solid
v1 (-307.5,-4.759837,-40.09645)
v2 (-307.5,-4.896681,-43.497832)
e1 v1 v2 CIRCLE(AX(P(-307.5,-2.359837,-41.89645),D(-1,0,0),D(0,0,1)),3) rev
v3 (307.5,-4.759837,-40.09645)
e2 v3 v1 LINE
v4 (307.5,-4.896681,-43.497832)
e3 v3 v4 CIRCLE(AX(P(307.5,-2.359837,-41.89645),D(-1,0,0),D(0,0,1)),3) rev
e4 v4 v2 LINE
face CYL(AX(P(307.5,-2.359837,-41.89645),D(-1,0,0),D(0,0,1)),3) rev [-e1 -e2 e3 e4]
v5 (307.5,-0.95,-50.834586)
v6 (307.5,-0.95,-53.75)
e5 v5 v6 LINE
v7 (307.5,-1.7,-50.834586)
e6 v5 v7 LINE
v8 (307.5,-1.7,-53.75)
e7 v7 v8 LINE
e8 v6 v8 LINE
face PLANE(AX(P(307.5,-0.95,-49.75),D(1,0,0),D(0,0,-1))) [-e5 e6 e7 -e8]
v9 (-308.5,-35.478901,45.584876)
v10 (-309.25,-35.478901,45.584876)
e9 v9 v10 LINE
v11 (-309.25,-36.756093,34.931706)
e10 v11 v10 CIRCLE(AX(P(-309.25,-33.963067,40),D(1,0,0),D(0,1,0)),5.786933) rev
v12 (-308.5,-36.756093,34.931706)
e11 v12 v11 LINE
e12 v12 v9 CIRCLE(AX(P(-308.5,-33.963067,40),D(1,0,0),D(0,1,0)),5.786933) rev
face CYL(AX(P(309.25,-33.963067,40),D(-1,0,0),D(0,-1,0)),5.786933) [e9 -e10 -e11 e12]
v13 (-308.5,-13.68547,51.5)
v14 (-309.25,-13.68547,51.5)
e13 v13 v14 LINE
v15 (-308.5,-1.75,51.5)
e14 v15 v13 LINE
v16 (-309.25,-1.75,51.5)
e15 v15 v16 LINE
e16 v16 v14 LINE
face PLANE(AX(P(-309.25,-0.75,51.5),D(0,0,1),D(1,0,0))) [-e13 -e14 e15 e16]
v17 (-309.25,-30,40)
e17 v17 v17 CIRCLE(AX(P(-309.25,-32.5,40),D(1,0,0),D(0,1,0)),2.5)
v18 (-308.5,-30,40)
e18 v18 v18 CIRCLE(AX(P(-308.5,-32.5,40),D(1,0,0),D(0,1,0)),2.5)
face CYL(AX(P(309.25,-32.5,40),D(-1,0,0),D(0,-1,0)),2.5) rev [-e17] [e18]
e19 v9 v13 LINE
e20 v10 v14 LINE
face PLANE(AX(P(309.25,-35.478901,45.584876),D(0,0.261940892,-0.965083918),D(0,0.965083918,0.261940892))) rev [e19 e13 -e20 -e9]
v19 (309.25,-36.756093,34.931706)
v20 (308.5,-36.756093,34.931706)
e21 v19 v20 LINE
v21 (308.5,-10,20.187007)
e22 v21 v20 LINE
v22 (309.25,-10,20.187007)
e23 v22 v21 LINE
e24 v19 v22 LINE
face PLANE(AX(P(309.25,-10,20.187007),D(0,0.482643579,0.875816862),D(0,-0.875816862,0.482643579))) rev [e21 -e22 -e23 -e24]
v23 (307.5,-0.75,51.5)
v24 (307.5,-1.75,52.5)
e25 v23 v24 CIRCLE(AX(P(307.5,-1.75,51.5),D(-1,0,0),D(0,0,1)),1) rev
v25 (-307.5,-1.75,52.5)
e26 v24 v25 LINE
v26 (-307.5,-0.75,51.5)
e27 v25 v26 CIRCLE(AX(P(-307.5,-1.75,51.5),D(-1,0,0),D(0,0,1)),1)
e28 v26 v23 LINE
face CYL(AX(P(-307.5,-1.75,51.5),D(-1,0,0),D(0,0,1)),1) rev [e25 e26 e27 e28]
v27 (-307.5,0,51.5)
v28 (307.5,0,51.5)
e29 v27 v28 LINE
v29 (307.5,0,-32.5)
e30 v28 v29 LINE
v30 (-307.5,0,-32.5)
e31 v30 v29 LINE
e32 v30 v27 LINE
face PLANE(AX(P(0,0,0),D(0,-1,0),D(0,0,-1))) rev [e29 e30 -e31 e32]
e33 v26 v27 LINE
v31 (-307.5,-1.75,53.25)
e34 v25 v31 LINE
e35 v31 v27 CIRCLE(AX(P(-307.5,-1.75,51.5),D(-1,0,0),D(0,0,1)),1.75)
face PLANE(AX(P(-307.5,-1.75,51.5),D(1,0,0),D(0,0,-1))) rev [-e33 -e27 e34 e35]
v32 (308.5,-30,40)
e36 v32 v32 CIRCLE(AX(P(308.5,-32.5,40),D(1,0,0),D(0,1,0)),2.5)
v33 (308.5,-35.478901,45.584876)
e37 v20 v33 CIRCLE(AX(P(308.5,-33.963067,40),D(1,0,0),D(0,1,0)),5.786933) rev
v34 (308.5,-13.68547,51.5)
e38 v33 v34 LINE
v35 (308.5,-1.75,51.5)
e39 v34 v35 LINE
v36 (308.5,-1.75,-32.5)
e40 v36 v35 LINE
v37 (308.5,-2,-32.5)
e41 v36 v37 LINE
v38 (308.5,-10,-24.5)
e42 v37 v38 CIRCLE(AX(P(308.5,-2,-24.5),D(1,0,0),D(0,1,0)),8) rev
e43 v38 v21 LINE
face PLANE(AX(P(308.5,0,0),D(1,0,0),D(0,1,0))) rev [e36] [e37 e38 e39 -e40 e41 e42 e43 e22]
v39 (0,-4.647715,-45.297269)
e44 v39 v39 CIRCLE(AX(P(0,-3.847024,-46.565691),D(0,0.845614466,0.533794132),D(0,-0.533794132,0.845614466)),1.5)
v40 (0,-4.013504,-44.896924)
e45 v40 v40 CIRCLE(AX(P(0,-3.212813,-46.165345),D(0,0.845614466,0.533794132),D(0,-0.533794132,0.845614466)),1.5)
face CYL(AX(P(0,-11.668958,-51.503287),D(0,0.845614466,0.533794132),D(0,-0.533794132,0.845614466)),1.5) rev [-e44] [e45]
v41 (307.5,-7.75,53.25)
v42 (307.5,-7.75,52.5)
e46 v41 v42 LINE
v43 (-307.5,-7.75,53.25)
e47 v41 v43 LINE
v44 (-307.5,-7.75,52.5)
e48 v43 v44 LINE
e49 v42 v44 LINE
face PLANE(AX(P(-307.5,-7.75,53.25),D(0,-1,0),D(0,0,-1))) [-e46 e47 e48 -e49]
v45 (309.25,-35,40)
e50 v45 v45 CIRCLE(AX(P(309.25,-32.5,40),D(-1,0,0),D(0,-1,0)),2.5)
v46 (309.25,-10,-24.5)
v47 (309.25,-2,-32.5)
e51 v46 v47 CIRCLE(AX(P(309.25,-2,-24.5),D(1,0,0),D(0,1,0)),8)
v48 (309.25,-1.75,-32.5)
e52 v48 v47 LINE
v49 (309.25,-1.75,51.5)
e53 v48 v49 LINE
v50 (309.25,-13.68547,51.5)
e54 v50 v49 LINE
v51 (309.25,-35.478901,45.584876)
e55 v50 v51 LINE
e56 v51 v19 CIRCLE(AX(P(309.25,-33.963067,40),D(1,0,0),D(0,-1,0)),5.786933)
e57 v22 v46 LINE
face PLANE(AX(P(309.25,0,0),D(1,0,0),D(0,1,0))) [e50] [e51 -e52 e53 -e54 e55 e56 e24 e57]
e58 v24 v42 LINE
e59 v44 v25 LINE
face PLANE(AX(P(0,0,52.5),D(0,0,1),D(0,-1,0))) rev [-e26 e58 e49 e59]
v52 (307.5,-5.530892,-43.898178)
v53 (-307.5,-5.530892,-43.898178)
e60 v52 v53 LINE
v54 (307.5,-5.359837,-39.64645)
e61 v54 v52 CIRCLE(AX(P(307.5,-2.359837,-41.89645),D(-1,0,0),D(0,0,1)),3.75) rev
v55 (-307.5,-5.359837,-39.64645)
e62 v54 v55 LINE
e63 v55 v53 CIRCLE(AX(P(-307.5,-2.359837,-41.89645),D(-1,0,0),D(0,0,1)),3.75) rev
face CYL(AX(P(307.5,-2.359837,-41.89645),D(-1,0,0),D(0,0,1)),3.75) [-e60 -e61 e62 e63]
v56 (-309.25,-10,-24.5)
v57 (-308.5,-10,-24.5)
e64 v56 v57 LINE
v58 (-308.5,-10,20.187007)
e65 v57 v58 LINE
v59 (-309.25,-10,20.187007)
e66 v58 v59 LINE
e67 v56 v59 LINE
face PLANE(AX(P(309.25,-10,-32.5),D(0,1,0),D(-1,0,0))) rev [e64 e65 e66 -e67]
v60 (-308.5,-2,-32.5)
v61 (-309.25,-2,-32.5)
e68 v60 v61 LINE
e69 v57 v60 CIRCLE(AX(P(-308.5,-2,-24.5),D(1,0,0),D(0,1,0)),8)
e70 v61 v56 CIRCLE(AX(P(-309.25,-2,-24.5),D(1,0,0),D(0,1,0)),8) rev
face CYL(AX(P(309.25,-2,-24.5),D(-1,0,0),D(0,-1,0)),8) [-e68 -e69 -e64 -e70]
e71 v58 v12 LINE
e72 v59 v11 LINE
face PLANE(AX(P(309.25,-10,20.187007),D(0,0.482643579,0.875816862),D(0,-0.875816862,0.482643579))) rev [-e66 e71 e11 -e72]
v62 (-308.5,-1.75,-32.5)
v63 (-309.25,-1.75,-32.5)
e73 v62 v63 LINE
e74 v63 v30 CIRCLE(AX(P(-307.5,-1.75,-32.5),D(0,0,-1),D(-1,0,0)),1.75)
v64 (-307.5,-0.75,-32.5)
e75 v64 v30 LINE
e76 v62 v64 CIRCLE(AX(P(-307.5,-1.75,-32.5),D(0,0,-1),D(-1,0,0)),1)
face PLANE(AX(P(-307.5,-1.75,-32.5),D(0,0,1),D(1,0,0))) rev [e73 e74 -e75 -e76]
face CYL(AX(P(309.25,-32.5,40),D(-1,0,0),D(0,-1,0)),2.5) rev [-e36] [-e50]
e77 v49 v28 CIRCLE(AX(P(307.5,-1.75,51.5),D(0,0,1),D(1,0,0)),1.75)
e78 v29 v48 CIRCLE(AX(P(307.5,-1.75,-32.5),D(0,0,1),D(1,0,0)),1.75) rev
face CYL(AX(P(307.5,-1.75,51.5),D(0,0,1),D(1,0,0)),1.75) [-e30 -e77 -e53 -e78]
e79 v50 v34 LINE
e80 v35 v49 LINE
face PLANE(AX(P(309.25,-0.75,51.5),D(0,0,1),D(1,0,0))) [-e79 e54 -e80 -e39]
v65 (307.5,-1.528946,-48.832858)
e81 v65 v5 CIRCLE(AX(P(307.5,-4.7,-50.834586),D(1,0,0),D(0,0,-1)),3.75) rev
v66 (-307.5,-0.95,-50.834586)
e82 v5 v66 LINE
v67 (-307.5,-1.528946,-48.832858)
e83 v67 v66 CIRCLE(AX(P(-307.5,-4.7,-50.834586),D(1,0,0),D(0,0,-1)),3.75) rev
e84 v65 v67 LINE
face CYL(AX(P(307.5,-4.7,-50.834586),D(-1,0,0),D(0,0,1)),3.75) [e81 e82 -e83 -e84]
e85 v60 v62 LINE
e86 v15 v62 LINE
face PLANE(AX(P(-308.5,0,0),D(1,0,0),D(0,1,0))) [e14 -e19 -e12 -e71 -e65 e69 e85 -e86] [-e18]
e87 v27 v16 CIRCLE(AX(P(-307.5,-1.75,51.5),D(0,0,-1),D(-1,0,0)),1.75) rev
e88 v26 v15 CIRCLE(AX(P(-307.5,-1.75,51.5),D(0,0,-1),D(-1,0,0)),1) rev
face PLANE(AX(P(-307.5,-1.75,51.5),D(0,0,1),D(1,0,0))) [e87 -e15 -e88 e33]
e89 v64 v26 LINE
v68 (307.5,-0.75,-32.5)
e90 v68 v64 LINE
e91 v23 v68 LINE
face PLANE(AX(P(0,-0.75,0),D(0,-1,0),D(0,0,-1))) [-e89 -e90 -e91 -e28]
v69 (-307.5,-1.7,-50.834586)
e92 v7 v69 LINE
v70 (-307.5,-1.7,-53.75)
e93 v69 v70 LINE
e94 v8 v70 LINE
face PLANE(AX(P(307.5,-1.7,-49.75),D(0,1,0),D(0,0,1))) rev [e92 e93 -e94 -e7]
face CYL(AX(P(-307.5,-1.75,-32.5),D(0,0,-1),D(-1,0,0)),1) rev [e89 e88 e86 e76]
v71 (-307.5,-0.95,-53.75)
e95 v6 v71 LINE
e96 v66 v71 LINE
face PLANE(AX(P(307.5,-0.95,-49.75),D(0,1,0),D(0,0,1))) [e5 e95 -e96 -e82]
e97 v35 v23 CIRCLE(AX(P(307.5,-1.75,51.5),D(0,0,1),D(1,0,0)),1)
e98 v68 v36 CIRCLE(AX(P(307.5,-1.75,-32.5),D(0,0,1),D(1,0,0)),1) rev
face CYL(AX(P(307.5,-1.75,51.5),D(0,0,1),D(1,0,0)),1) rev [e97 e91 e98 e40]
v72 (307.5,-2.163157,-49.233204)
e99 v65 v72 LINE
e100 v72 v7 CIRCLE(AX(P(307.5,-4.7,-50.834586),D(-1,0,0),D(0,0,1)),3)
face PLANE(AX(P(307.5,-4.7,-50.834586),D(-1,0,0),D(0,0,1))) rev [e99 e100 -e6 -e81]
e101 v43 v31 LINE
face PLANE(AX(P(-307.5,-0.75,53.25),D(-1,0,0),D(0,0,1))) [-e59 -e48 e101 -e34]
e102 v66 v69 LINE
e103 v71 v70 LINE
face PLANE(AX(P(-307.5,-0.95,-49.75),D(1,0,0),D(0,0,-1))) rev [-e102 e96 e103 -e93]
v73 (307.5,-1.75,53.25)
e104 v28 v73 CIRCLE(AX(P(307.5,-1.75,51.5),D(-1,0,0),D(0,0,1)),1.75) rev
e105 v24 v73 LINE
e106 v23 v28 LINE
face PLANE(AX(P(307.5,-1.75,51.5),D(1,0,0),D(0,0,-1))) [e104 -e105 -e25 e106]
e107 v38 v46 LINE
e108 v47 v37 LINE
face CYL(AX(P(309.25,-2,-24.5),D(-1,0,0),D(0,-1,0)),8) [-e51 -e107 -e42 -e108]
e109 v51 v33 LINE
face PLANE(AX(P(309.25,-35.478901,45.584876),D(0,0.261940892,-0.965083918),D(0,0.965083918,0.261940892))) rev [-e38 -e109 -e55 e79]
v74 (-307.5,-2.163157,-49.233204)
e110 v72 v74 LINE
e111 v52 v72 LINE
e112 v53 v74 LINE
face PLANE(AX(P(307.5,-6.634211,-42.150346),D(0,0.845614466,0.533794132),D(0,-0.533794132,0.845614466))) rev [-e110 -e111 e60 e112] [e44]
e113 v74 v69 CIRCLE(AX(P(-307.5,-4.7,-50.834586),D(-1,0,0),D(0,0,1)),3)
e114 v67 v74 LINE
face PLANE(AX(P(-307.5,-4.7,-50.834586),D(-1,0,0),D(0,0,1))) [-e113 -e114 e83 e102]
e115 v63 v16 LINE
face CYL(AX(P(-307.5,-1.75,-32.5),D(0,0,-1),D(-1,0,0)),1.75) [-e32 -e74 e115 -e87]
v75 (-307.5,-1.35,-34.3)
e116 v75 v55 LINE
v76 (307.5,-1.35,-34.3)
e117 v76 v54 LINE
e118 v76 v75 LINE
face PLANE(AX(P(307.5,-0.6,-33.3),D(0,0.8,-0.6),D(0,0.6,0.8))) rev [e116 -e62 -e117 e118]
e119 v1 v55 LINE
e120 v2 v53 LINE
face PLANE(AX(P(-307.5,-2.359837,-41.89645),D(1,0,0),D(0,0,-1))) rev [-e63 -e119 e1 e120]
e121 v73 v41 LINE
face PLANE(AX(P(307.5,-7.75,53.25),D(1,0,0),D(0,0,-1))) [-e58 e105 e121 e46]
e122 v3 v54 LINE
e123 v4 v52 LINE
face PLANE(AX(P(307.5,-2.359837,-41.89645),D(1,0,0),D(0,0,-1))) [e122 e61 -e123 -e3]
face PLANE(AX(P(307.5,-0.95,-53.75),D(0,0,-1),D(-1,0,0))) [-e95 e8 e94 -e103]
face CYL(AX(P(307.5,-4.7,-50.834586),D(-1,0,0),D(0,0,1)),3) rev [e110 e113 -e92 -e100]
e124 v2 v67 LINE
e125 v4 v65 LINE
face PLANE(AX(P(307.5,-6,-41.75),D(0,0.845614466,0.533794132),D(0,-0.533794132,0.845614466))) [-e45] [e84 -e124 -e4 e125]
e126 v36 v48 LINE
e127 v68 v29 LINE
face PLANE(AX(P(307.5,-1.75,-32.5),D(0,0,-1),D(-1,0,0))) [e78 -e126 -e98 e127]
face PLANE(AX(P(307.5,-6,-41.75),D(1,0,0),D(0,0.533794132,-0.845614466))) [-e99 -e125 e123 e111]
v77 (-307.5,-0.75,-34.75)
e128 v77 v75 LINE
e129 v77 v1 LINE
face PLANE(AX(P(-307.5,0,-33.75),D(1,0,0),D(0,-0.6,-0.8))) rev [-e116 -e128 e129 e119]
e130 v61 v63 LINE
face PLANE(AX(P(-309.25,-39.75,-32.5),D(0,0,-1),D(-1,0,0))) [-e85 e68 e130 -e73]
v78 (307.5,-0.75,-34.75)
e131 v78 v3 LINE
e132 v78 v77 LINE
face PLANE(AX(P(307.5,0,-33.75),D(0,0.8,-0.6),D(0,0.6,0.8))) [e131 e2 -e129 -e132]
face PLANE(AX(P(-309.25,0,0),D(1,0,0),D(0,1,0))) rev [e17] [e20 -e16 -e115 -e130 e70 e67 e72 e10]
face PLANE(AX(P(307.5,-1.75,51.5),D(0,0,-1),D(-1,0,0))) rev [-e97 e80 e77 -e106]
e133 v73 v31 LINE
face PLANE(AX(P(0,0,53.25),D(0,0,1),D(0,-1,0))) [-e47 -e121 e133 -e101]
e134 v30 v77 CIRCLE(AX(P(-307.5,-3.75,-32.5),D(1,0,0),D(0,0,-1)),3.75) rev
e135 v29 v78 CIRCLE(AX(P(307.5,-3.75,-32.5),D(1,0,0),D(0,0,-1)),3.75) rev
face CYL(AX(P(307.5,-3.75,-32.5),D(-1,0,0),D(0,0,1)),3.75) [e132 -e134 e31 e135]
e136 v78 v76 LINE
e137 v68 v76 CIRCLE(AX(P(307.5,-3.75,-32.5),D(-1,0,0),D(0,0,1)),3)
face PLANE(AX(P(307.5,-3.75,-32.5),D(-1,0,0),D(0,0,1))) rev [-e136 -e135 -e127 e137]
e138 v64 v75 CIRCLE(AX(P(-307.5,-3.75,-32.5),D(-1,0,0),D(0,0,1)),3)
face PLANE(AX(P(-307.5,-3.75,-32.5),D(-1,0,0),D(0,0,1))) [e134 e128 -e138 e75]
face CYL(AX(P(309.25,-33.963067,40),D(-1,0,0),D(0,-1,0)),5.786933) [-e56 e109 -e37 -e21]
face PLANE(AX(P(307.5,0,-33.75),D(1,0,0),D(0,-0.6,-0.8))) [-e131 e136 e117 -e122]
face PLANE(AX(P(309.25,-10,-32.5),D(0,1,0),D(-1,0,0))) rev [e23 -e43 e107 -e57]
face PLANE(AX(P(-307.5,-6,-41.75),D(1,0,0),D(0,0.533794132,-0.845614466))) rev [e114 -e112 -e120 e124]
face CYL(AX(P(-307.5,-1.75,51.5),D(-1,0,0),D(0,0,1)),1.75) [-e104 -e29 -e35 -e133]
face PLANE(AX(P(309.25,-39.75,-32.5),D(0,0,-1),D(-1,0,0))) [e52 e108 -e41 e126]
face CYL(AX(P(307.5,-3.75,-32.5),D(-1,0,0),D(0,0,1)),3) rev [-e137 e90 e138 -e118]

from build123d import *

# Parameters (mm, degrees)
SKETCH1_W                    = 615
SKETCH1_H                    = 105
BASE_FLANGE1_DEPTH           = 0.75
EDGE_FLANGE1_STRIP_W         = 5
EDGE_FLANGE1_STRIP_H         = 0.75
EDGE_FLANGE1_STRIP_CUT_DEPTH = 615
EDGE_FLANGE1_DEPTH           = 615
SKETCH16_W                   = 615
SKETCH16_H                   = 196.52545168
CUT_EXTRUDE1_DEPTH           = 10
SWEPT_START                  = -307.5
SWEPT_FLANGE1_DEPTH          = 615
EDGE_FLANGE2_DEPTH           = 84
EDGE_FLANGE2_BEND_DEPTH      = 84
CUT_EXTRUDE2_DEPTH           = 623.102383053
CUT_EXTRUDE2_DEPTH_BACK      = 623.102383053
SKETCH39_R                   = 2.5
FILLET1_R                    = 8
SKETCH40_R                   = 1.5
CUT_EXTRUDE3_DEPTH           = 10


# Read off the part's stored shape, not the designer's step: Swept Flange1
# Sheet-metal steps are written as plain solids
with BuildPart() as part:
    # Sketch1 → Base-Flange1 (new body)
    with BuildSketch(Plane(origin=(0, 0, 0), x_dir=(1, 0, 0), z_dir=(0, 1, 0))):
        Rectangle(SKETCH1_W, SKETCH1_H)
    extrude(amount=-BASE_FLANGE1_DEPTH)

    # Edge-Flange1 strip (across the edge) → Edge-Flange1 strip cut (cut)
    with BuildSketch(Plane(origin=(307.5, -0.75, 52.5), x_dir=(0, 0, -1), z_dir=(-1, 0, 0))):
        with Locations((-1.5, -0.375)):
            Rectangle(EDGE_FLANGE1_STRIP_W, EDGE_FLANGE1_STRIP_H)
    extrude(amount=EDGE_FLANGE1_STRIP_CUT_DEPTH, mode=Mode.SUBTRACT)

    # Edge-Flange1 section (across the edge) → Edge-Flange1 (add)
    with BuildSketch(Plane(origin=(307.5, -0.75, 52.5), x_dir=(0, 0, -1), z_dir=(-1, 0, 0))):
        with BuildLine():
            Line((-0.75, 1), (-0.75, 7))
            Line((-0.75, 7), (0, 7))
            Line((0, 7), (0, 1))
            ThreePointArc((0, 1), (0.292893219, 0.292893219), (1, 0))
            Line((1, 0), (1, -0.75))
            ThreePointArc((1, -0.75), (-0.237436867, -0.237436867), (-0.75, 1))
        make_face()
    extrude(amount=EDGE_FLANGE1_DEPTH)

    # Sketch16 → Cut-Extrude1 (cut)
    with BuildSketch(Plane(origin=(0, 0, 0), x_dir=(1, 0, 0), z_dir=(0, 1, 0))):
        with Locations((0, 130.76272584)):
            Rectangle(SKETCH16_W, SKETCH16_H)
    extrude(amount=-CUT_EXTRUDE1_DEPTH, mode=Mode.SUBTRACT)

    # Swept Flange1 outline → Swept Flange1 (add)
    with BuildSketch(Plane.YZ.offset(SWEPT_START)):
        with BuildLine():
            Line((-1.7, -50.834586207), (-1.7, -53.75))
            Line((-1.7, -53.75), (-0.95, -53.75))
            Line((-0.95, -53.75), (-0.95, -50.834586207))
            ThreePointArc((-0.95, -50.834586207), (-1.097642895, -49.792701719), (-1.528945753, -48.832858214))
            Line((-1.528945753, -48.832858214), (-4.896680845, -43.497832325))
            ThreePointArc((-4.896680845, -43.497832325), (-5.357412506, -41.775852388), (-4.759837447, -40.09644993))
            Line((-4.759837447, -40.09644993), (-0.75, -34.75))
            ThreePointArc((-0.75, -34.75), (-0.192437632, -33.685854123), (0, -32.5))
            Line((0, -32.5), (-0.75, -32.5))
            ThreePointArc((-0.75, -32.5), (-0.903950106, -33.448683298), (-1.35, -34.3))
            Line((-1.35, -34.3), (-5.359837447, -39.64644993))
            ThreePointArc((-5.359837447, -39.64644993), (-6.106806271, -41.745703002), (-5.530891695, -43.898177923))
            Line((-5.530891695, -43.898177923), (-2.163156602, -49.233203812))
            ThreePointArc((-2.163156602, -49.233203812), (-1.818114316, -50.001078617), (-1.7, -50.834586207))
        make_face()
    extrude(amount=SWEPT_FLANGE1_DEPTH)

    # Edge-Flange2 section (across the edge) → Edge-Flange2 (add)
    with BuildSketch(Plane(origin=(308.5, -0.75, -32.5), x_dir=(-1, 0, 0), z_dir=(0, 0, 1))):
        with BuildLine():
            Line((-0.75, 1), (-0.75, 39))
            Line((-0.75, 39), (0, 39))
            Line((0, 39), (0, 1))
            ThreePointArc((0, 1), (0.292893219, 0.292893219), (1, 0))
            Line((1, 0), (1, -0.75))
            ThreePointArc((1, -0.75), (-0.237436867, -0.237436867), (-0.75, 1))
        make_face()
    extrude(amount=EDGE_FLANGE2_DEPTH)

    # Edge-Flange2 section 2 (across the edge) → Edge-Flange2 bend (add)
    with BuildSketch(Plane(origin=(-308.5, -0.75, 51.5), x_dir=(1, 0, 0), z_dir=(0, 0, -1))):
        with BuildLine():
            Line((-0.75, 1), (-0.75, 39))
            Line((-0.75, 39), (0, 39))
            Line((0, 39), (0, 1))
            ThreePointArc((0, 1), (0.292893219, 0.292893219), (1, 0))
            Line((1, 0), (1, -0.75))
            ThreePointArc((1, -0.75), (-0.237436867, -0.237436867), (-0.75, 1))
        make_face()
    extrude(amount=EDGE_FLANGE2_BEND_DEPTH)

    # Sketch39 → Cut-Extrude2 (cut, two sides: drawn at the far end of the back side and taken through both)
    with BuildSketch(Plane.ZY.offset(309.25).offset(-CUT_EXTRUDE2_DEPTH_BACK)):
        with Locations(Location((40, -32.5, 0), (0, 0, 90))):
            Circle(SKETCH39_R)
        with BuildLine():
            Line((-32.5, -10), (20.187006795, -10))
            Line((20.187006795, -10), (34.931706284, -36.756092926))
            ThreePointArc((34.931706284, -36.756092926), (37.056741569, -38.945618932), (40, -39.75))
            ThreePointArc((40, -39.75), (43.515434794, -38.559838948), (45.58487621, -35.47890121))
            Line((45.58487621, -35.47890121), (51.5, -13.685469847))
            Line((51.5, -13.685469847), (60.41713226, -13.685469847))
            Line((60.41713226, -13.685469847), (60.41713226, -59.649041705))
            Line((60.41713226, -59.649041705), (-51.871278106, -59.649041705))
            Line((-51.871278106, -59.649041705), (-51.871278106, -10))
            Line((-51.871278106, -10), (-32.5, -10))
        make_face()
    extrude(amount=CUT_EXTRUDE2_DEPTH + CUT_EXTRUDE2_DEPTH_BACK, mode=Mode.SUBTRACT)

    # Fillet1
    fillet1_edges = [part.edges().sort_by_distance(p)[0] for p in [
        (308.875, -10, -32.5),
        (-308.875, -10, -32.5),
    ]]
    fillet(fillet1_edges, radius=FILLET1_R)

    # Sketch40 → Cut-Extrude3 (cut)
    with BuildSketch(Plane(origin=(0, -23.135666601, -14.604389542), x_dir=(1, 0, 0), z_dir=(0, 0.8456144659552722, 0.5337941316342656))):
        with Locations(Location((0, 37.3231029, 0), (0, 0, 270))):
            Circle(SKETCH40_R)
    extrude(amount=-CUT_EXTRUDE3_DEPTH, mode=Mode.SUBTRACT)


solid = part.part
